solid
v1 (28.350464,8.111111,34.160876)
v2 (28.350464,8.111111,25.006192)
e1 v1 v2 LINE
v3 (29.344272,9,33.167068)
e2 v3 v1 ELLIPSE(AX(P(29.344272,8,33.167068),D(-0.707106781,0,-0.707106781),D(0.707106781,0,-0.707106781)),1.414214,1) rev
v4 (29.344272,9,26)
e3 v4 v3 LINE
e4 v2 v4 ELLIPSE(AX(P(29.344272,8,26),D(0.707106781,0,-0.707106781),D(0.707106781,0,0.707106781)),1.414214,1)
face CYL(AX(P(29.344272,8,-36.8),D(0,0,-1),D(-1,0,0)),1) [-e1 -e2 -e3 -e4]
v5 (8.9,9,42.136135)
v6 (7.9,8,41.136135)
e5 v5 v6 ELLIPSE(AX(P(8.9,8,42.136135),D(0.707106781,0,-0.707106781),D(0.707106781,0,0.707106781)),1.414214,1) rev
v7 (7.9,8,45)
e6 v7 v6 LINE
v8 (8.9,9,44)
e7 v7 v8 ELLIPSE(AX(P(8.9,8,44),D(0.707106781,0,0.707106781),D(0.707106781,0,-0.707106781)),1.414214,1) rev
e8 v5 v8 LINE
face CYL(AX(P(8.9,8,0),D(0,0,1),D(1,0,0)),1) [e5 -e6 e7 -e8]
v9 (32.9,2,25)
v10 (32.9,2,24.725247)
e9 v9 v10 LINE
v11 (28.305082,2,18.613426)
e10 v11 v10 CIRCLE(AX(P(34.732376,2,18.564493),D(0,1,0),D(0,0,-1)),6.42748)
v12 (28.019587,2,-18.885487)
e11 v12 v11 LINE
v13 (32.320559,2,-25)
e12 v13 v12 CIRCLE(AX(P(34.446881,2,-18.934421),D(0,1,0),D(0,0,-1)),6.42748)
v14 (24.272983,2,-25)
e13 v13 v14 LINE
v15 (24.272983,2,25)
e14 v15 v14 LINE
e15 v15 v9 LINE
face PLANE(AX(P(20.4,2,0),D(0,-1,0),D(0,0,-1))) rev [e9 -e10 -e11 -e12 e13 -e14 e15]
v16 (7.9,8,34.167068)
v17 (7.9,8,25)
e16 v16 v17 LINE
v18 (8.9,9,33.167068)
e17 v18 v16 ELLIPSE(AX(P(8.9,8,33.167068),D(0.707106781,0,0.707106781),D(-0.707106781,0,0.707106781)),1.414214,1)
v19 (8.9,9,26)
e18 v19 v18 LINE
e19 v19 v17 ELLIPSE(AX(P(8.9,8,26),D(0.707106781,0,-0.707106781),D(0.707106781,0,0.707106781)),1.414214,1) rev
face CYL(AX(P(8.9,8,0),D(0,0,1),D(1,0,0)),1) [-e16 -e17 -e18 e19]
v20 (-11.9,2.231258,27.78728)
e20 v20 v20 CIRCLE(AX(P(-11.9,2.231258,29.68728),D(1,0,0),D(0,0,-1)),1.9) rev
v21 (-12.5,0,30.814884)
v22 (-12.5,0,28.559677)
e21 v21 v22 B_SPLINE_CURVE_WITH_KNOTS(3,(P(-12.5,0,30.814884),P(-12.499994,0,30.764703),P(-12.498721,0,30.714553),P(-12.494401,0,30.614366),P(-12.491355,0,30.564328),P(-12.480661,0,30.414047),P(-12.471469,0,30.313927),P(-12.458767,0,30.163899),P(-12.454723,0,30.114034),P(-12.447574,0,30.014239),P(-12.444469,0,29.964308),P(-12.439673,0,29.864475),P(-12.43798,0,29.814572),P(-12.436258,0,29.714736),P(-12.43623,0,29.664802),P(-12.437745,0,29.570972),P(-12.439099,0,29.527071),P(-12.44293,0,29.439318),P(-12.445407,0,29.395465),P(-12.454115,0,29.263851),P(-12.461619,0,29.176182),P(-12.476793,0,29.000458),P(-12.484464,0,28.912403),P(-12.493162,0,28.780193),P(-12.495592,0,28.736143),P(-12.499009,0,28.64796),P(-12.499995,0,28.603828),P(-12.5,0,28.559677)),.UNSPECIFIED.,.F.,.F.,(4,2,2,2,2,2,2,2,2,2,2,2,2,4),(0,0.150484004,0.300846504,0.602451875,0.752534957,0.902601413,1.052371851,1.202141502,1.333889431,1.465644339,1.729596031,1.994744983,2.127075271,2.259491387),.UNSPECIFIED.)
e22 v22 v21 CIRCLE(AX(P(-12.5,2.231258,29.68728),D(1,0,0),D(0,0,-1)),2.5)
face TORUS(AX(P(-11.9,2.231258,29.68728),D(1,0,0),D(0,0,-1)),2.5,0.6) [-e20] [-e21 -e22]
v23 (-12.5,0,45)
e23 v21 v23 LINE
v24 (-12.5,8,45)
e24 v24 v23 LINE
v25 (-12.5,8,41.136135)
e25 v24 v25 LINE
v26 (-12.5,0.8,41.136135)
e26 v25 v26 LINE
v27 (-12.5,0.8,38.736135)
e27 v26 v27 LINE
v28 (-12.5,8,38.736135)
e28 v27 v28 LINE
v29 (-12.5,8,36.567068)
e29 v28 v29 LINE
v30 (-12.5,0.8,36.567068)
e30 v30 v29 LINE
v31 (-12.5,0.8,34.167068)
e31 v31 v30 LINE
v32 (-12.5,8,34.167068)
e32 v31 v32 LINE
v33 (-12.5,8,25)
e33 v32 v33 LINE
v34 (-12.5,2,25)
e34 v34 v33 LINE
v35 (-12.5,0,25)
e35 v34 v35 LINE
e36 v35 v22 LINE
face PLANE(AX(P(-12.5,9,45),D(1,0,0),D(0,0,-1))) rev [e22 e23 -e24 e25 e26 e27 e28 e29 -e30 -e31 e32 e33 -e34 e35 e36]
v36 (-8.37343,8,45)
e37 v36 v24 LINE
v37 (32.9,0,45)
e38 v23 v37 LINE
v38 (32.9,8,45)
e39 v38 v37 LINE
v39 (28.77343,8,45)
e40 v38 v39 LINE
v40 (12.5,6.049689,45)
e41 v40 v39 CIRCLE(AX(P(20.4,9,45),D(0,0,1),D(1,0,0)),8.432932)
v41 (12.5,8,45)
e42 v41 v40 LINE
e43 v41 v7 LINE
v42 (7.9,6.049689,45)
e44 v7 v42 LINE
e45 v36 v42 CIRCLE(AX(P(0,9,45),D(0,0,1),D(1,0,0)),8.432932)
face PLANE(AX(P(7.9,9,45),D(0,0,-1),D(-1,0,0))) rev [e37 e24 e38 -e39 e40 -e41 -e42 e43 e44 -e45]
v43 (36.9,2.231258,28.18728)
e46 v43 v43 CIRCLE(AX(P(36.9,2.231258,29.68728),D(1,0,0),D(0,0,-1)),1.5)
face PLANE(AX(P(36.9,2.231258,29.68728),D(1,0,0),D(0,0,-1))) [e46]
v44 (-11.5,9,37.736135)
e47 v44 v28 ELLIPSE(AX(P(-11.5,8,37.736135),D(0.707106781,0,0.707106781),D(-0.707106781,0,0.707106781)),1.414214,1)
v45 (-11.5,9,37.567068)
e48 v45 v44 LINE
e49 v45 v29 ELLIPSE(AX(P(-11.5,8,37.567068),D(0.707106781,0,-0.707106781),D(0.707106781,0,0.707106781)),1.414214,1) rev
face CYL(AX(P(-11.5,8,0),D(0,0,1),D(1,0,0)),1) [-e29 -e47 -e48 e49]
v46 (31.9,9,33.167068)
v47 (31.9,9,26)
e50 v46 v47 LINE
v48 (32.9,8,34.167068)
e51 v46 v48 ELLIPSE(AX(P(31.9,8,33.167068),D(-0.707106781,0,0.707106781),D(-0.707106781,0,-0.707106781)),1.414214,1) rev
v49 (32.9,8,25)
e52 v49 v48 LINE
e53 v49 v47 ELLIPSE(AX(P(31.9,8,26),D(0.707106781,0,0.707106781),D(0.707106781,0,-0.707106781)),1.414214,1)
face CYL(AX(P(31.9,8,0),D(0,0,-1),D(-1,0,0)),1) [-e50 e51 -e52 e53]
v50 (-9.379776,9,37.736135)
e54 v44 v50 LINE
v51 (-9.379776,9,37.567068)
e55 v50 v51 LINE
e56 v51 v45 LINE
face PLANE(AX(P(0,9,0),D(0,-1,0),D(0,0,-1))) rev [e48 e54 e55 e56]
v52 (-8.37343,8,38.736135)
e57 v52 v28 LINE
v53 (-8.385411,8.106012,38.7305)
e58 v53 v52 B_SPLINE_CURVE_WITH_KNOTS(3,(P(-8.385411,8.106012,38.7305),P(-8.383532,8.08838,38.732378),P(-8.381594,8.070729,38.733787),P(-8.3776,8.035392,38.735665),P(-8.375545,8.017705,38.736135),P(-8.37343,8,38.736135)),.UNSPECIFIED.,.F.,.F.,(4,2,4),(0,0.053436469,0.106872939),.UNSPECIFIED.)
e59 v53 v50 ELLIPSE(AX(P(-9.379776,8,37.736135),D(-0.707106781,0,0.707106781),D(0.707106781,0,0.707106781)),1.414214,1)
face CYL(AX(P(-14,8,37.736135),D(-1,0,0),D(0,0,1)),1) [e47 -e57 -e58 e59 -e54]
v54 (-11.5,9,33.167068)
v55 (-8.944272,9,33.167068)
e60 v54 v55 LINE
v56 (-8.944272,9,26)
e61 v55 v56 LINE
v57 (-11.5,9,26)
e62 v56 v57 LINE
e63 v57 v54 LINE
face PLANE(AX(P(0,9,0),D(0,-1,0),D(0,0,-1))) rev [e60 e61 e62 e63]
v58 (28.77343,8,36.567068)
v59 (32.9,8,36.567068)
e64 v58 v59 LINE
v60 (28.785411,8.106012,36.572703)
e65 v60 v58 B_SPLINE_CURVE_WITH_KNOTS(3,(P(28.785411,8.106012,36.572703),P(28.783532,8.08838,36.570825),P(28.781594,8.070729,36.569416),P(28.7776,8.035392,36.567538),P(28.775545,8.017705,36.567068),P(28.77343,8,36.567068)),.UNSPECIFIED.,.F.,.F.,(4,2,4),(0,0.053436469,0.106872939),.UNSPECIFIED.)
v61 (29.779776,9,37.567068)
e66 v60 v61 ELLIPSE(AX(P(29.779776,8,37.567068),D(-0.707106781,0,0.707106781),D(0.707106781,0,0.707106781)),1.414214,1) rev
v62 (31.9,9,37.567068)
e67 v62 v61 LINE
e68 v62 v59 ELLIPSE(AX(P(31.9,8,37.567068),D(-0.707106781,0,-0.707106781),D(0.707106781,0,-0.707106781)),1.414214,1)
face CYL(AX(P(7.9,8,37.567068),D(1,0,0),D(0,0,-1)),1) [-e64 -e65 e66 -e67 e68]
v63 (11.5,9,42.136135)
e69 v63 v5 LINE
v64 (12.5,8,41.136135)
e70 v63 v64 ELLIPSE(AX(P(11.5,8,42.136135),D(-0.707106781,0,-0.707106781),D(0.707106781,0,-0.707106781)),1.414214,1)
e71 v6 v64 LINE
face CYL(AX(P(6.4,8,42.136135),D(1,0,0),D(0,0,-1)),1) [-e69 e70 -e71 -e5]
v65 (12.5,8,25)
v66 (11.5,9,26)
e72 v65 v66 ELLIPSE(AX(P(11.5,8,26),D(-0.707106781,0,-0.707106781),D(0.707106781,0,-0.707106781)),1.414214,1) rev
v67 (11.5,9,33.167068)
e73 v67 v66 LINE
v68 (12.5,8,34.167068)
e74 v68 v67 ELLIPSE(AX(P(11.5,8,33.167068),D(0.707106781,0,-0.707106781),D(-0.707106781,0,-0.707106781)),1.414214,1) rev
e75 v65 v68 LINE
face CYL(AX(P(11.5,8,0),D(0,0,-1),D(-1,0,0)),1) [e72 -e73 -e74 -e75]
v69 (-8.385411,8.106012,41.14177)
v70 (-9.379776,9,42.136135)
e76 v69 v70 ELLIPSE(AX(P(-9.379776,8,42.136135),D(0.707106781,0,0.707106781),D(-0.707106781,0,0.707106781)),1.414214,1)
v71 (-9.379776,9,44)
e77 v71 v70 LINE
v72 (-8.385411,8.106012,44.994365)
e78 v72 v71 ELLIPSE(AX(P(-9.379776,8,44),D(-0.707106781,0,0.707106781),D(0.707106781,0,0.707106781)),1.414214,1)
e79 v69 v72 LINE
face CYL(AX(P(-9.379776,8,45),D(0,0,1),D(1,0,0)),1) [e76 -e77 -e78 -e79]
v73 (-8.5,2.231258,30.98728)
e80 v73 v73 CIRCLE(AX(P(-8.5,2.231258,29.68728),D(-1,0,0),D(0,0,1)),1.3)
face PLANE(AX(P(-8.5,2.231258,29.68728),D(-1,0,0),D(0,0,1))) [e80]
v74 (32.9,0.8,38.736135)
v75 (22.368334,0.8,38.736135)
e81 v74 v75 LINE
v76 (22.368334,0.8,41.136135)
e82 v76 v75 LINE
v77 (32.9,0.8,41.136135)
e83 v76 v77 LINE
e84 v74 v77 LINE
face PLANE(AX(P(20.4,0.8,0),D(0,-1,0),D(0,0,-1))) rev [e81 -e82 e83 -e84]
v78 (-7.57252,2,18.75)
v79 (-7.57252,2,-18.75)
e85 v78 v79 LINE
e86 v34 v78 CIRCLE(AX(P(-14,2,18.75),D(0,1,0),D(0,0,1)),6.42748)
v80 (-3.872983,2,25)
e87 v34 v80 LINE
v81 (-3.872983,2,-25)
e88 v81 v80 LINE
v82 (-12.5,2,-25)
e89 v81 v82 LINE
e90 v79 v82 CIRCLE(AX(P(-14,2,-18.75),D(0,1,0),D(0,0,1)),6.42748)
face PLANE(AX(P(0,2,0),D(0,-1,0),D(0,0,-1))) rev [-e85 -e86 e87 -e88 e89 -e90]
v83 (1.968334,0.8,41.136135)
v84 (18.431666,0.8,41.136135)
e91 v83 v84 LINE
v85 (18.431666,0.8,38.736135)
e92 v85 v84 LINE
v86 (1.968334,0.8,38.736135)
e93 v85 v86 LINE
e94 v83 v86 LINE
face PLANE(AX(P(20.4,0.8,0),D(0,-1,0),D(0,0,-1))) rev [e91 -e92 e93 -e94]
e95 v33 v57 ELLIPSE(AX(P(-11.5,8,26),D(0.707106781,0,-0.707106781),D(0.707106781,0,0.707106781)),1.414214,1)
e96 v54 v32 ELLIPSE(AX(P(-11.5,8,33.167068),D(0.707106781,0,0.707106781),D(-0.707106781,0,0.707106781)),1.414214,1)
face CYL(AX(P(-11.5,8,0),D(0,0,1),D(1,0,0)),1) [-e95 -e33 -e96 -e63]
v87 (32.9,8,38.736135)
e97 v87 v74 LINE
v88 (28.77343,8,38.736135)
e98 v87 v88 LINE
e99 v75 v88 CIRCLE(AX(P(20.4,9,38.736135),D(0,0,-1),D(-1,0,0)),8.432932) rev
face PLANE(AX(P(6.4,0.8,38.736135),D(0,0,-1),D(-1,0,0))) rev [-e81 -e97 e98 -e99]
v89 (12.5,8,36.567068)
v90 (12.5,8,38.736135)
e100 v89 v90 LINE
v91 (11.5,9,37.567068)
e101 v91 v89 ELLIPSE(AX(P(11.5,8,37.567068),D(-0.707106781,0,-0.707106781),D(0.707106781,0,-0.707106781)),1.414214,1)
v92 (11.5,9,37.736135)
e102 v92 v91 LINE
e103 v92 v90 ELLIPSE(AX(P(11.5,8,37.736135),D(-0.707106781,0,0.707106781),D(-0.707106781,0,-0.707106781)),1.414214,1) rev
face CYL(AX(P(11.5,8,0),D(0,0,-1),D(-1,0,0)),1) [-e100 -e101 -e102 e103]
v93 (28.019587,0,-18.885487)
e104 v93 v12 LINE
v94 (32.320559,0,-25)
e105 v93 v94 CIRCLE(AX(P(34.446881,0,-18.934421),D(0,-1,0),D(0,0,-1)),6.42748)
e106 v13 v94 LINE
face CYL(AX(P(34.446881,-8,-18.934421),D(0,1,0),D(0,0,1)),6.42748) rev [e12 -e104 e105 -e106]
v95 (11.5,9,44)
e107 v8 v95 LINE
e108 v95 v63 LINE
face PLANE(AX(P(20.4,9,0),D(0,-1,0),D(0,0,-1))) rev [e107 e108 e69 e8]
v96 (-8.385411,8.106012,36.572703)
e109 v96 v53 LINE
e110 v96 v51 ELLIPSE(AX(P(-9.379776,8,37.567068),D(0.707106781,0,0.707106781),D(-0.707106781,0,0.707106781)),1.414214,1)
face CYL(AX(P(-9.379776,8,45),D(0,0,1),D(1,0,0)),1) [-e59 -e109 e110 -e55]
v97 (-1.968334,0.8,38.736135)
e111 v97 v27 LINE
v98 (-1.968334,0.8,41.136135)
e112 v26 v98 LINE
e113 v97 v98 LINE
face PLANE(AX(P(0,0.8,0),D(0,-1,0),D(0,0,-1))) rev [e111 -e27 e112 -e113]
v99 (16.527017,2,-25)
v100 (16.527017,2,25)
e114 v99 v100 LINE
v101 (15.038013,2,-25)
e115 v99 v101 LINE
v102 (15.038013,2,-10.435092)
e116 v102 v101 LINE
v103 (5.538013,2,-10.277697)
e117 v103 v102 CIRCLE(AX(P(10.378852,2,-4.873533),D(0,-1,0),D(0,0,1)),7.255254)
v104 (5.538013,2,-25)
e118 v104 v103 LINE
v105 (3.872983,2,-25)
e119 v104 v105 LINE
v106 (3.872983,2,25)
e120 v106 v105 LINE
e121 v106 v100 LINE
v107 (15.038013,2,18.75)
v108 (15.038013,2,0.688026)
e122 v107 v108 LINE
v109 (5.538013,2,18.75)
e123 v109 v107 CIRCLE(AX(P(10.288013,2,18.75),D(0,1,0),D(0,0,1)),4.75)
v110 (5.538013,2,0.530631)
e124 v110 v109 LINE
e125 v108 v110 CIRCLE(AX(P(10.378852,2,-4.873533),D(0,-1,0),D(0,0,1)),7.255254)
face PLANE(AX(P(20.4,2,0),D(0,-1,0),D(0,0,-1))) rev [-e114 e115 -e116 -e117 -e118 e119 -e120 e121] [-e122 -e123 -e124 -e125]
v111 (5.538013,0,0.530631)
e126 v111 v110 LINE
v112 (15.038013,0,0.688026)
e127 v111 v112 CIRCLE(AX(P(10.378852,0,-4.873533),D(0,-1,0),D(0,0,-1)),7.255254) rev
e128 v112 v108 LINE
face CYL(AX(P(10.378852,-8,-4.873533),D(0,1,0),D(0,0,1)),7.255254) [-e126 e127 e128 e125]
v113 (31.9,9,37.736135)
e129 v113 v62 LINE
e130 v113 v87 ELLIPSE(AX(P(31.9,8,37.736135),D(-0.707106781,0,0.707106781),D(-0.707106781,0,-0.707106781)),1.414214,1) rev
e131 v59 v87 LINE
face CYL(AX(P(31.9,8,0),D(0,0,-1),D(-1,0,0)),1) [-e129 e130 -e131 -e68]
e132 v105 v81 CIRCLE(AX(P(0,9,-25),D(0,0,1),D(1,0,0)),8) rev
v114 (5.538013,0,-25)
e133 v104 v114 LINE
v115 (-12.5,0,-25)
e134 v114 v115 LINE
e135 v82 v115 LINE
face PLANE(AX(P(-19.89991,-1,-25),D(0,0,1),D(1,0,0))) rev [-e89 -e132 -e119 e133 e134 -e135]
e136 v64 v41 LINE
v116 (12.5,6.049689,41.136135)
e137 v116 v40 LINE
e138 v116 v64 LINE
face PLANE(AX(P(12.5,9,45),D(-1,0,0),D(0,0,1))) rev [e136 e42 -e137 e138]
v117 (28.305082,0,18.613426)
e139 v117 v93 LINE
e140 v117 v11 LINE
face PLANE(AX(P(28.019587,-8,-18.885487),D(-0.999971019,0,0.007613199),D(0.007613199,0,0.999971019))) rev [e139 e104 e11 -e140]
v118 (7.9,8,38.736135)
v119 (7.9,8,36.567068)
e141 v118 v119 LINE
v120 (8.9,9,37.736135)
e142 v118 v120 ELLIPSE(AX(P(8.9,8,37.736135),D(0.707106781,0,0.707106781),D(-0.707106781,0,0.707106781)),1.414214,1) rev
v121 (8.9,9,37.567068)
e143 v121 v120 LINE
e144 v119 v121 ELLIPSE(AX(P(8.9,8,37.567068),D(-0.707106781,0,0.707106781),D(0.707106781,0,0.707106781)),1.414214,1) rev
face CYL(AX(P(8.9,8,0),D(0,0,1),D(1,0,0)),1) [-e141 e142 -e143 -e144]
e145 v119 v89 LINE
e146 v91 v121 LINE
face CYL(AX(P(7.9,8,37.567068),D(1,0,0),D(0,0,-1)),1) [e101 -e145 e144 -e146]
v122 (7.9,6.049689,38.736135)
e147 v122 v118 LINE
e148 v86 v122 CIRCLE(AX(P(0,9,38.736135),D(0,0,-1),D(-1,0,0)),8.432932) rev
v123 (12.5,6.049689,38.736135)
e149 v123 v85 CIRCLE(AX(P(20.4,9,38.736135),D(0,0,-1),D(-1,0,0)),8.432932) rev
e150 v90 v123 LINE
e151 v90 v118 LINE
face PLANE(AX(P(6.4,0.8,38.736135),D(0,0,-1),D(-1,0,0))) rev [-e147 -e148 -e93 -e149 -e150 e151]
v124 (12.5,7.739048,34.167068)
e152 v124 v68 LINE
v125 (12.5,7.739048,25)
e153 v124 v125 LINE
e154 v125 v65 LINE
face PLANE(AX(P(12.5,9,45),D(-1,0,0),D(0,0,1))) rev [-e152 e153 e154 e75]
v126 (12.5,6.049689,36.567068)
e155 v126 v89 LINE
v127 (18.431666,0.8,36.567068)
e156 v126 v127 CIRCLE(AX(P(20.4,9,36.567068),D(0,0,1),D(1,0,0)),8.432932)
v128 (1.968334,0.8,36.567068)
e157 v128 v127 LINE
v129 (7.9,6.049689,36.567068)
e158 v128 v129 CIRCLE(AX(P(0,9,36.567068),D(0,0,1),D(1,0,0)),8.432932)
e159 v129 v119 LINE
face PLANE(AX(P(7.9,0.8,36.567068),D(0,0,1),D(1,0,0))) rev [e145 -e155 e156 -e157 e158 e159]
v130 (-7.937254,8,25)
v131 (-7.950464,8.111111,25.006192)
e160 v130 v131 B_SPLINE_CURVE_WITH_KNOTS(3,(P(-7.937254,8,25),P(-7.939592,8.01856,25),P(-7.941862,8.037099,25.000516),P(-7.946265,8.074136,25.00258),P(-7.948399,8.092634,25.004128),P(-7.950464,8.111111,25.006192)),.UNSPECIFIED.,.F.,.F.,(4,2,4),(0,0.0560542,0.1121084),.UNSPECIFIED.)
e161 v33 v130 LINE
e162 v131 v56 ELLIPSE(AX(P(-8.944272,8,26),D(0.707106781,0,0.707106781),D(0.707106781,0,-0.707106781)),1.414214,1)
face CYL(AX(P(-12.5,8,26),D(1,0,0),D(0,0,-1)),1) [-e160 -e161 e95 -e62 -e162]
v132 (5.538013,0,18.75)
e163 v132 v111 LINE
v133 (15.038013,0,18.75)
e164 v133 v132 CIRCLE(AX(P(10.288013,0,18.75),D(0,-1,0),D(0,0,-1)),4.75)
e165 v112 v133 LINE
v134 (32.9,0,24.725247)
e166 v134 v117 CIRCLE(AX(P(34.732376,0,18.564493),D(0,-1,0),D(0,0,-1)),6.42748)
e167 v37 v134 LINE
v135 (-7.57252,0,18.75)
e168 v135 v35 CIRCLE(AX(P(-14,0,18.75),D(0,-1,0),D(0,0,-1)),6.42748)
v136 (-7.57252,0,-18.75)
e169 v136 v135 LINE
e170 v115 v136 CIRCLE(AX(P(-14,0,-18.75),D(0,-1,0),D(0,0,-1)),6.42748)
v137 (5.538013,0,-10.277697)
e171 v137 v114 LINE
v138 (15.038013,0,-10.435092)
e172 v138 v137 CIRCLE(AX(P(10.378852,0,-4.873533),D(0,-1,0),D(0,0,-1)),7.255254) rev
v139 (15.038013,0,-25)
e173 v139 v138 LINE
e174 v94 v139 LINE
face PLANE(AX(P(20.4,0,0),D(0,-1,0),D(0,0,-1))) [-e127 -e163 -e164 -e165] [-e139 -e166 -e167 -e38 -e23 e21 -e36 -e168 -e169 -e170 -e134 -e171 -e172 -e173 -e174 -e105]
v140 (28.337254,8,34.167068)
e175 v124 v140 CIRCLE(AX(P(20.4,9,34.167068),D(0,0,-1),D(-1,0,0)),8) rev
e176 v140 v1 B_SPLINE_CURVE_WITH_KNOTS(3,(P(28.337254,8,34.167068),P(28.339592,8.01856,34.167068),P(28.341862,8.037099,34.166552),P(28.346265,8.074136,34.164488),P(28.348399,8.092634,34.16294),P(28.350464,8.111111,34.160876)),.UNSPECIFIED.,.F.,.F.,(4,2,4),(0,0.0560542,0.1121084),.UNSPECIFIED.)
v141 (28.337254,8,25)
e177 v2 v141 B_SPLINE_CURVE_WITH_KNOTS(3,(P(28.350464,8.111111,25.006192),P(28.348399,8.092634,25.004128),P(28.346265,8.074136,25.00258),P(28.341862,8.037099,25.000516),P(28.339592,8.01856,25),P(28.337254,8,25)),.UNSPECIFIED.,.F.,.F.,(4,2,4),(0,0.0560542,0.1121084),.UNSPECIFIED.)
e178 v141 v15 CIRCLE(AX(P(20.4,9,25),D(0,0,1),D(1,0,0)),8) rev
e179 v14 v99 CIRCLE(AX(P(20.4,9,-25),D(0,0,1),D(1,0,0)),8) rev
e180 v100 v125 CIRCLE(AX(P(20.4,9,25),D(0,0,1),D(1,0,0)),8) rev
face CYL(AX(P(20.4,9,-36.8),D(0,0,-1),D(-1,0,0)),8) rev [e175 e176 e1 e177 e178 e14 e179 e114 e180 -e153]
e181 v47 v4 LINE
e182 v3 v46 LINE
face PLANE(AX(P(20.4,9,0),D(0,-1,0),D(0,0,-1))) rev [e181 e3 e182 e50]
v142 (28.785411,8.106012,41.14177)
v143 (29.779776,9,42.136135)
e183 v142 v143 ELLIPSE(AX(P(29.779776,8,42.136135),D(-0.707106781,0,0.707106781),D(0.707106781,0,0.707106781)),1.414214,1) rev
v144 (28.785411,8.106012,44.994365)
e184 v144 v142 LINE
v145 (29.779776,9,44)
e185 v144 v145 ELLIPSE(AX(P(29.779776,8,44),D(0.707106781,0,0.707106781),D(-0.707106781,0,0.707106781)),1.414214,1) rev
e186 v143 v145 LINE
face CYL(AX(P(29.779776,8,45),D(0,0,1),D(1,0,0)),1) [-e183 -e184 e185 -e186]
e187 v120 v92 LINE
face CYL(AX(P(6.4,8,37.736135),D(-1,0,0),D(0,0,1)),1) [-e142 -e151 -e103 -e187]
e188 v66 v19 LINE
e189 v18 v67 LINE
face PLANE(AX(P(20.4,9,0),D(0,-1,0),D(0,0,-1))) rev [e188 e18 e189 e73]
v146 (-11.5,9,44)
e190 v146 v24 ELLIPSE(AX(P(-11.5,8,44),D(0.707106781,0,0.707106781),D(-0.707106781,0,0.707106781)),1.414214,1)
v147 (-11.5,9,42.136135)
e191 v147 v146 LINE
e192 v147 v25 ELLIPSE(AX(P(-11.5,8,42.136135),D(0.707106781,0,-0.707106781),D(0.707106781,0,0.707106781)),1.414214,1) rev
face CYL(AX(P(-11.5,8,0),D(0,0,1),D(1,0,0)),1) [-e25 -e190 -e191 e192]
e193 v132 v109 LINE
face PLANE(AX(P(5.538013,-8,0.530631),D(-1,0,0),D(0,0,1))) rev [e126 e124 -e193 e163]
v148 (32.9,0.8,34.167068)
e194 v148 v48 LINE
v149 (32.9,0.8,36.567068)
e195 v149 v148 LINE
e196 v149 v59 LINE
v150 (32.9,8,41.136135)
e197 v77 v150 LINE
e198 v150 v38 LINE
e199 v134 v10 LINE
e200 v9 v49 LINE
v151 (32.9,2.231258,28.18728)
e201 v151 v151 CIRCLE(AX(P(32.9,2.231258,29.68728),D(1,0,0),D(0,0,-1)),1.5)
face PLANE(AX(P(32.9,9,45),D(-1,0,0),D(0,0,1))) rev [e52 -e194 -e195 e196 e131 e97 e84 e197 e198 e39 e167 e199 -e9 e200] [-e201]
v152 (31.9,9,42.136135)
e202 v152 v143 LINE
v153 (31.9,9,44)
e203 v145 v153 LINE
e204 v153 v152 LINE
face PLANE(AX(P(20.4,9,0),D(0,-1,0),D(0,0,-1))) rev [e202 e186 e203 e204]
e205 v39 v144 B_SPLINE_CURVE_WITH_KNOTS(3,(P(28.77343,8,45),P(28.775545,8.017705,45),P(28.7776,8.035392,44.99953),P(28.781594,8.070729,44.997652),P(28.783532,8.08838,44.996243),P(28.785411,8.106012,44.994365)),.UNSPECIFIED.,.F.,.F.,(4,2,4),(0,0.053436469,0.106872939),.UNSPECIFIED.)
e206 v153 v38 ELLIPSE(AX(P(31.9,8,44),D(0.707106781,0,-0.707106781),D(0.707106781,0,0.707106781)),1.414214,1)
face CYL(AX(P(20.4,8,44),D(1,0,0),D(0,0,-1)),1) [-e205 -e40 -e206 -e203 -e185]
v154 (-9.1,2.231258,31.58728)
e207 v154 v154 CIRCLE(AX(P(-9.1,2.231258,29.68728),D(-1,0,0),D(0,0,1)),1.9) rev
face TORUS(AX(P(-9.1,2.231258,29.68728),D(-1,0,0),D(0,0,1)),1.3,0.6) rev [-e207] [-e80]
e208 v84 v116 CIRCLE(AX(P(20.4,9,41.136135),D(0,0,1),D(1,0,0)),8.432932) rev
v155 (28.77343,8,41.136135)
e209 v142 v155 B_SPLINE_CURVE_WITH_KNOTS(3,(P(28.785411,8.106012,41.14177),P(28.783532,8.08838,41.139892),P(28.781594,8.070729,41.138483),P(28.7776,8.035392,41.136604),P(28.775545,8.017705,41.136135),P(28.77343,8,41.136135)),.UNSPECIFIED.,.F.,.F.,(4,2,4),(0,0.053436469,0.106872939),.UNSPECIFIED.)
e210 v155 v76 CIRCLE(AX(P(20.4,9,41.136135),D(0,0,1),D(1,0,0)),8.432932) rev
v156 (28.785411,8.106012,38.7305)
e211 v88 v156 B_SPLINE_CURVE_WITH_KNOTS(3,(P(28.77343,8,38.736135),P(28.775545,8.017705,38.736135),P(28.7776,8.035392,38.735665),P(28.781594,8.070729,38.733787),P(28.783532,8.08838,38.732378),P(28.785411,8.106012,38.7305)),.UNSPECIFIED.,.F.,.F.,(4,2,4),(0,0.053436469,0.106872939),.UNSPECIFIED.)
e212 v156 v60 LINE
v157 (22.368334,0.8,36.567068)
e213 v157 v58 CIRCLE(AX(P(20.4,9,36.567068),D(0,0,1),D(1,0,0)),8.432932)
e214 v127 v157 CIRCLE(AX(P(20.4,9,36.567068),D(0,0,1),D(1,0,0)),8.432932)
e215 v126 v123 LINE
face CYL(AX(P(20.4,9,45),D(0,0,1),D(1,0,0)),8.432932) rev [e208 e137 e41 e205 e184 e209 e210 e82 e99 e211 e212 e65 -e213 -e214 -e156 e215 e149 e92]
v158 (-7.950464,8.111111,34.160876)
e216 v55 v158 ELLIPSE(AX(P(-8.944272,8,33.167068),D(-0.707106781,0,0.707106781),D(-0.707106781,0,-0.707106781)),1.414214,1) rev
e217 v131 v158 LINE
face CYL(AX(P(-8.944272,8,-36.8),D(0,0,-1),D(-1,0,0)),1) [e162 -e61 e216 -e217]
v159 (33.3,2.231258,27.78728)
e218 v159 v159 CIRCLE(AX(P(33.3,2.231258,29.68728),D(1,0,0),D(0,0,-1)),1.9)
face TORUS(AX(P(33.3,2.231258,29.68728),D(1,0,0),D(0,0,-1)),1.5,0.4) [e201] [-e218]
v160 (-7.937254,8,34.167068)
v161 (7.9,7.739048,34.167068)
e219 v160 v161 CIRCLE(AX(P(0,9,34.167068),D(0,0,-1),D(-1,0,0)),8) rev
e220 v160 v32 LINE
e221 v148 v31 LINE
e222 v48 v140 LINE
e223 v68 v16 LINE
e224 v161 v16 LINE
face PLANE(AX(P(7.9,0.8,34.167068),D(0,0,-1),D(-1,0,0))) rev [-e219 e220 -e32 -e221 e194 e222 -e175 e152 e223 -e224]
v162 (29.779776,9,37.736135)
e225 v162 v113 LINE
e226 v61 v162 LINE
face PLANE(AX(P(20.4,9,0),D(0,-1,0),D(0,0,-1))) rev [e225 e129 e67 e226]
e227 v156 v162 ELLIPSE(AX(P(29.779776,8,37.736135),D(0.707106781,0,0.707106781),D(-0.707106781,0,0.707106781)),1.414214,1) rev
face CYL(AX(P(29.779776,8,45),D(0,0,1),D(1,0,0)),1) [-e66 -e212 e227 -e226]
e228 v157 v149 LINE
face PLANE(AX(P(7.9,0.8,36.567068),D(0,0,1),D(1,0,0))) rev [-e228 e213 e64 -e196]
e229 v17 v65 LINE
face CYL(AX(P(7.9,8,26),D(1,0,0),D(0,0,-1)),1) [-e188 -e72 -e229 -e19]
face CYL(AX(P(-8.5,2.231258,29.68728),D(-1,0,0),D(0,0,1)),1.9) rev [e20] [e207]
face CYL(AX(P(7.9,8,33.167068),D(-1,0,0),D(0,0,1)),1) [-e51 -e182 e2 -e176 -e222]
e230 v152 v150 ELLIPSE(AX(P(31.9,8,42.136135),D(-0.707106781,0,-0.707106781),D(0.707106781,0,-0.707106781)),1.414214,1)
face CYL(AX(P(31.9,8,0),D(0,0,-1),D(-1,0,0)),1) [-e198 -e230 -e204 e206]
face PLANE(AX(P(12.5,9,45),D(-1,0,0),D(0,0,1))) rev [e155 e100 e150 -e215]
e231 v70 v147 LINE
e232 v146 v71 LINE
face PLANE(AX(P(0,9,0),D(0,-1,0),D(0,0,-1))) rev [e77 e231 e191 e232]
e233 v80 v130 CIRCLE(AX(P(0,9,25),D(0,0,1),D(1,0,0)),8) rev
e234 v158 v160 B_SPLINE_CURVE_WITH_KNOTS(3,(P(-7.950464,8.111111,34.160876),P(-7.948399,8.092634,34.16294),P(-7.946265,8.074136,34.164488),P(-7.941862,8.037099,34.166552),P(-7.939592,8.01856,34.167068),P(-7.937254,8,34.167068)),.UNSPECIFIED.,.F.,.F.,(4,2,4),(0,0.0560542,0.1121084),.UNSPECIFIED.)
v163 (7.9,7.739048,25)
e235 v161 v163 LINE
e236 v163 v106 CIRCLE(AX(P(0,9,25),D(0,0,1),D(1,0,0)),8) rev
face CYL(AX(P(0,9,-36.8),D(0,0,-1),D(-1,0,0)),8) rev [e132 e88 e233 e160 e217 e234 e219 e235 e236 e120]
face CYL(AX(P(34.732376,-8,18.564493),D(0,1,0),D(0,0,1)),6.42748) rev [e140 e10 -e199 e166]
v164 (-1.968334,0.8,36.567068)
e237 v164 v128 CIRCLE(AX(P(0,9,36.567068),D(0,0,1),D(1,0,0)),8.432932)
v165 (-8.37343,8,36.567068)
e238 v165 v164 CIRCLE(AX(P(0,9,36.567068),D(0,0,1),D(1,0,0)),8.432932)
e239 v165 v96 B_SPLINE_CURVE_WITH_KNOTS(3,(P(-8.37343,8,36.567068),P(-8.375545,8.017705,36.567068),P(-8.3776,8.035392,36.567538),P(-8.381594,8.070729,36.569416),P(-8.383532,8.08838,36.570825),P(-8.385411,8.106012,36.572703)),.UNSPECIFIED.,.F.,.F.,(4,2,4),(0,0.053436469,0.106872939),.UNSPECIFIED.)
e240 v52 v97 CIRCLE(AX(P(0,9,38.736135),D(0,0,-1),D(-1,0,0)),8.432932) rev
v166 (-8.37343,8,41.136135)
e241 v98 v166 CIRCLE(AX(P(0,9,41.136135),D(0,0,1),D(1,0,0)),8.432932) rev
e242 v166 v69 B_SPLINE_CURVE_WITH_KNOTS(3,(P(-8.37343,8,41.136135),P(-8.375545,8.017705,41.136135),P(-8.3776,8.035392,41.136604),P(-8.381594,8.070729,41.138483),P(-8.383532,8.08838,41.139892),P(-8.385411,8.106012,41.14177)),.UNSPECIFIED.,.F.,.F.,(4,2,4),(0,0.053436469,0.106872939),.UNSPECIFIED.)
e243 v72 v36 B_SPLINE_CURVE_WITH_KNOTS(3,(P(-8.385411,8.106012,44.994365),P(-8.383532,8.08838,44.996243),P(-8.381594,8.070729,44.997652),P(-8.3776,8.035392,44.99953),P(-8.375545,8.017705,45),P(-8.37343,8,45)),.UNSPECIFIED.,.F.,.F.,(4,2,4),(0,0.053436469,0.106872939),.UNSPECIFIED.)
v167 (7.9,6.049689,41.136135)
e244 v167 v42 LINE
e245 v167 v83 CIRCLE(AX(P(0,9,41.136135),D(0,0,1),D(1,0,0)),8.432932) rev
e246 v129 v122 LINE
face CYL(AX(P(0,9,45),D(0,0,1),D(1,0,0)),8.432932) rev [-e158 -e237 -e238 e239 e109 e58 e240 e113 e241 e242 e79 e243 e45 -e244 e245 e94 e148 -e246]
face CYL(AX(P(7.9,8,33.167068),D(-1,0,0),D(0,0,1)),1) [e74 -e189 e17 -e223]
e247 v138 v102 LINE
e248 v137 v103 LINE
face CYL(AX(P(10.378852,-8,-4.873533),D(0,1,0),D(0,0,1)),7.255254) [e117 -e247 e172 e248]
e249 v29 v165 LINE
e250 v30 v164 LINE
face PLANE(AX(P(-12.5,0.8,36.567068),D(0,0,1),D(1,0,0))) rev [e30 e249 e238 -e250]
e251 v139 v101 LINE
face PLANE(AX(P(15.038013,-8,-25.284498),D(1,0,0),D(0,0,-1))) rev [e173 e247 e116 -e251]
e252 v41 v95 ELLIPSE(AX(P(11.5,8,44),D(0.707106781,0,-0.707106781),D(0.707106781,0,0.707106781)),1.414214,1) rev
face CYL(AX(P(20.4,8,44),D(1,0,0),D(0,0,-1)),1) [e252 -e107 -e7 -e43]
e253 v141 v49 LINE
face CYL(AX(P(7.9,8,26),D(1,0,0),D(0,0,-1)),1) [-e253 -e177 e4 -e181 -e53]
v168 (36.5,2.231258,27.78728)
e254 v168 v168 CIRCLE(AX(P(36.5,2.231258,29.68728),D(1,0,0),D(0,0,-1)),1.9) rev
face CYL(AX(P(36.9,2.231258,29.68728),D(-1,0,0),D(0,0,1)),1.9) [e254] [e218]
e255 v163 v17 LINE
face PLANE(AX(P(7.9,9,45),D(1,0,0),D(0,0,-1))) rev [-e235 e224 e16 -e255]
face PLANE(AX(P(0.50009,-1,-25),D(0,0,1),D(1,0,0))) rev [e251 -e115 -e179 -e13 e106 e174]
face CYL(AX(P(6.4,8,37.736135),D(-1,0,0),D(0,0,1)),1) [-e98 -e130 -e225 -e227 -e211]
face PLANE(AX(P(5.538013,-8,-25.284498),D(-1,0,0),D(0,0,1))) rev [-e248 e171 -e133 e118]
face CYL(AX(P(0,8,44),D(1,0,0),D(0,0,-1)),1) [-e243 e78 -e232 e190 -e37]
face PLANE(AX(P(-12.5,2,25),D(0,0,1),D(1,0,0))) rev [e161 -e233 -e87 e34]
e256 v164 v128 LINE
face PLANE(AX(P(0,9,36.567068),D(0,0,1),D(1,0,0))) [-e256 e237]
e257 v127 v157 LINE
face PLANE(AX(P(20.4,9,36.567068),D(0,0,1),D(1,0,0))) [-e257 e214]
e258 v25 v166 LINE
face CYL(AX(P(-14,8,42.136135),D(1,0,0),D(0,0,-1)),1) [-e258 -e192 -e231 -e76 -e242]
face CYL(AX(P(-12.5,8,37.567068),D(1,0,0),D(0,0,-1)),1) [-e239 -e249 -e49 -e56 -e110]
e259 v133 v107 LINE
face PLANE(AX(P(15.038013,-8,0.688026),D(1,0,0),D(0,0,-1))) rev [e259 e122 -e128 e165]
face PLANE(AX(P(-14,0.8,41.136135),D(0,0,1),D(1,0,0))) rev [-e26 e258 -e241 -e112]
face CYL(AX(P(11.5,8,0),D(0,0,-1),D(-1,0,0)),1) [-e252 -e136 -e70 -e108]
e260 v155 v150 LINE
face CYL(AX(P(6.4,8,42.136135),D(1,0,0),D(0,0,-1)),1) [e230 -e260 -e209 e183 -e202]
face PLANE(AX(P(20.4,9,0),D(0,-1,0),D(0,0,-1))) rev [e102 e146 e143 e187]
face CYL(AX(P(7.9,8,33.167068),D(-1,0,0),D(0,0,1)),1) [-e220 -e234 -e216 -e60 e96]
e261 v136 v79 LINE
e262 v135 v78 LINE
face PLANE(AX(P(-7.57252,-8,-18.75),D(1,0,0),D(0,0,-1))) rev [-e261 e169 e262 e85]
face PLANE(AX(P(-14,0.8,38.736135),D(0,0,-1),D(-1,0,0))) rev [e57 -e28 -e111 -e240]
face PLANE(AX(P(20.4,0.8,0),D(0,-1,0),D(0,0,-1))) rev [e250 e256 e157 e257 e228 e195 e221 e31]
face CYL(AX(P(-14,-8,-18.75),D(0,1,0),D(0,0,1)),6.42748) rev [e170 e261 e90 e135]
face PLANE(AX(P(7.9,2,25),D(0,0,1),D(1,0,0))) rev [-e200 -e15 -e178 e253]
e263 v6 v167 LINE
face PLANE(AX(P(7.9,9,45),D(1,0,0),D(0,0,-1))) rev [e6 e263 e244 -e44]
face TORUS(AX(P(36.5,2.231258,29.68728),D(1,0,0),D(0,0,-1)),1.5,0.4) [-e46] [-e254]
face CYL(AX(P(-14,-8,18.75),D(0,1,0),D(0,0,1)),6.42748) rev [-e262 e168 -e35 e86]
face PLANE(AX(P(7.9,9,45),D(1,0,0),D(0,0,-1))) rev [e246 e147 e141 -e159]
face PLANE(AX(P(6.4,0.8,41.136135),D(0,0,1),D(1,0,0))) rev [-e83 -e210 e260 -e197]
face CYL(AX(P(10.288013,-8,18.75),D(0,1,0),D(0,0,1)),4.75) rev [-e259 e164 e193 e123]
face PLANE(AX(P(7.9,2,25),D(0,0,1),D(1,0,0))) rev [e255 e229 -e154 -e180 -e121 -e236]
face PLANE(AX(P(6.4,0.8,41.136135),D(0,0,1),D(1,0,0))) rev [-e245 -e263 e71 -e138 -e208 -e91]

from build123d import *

# Parameters (mm, degrees)
SKETCH1_W           = 25
SKETCH1_H           = 90
BOSS_EXTRUDE1_DEPTH = 9
SKETCH4_W           = 8
SKETCH4_H           = 71
SKETCH5_W           = 25
SKETCH5_H           = 2.4
SKETCH5_W_2         = 28
FLANGE_SLOT_DEPTH   = 8.2
SKETCH6_W           = 8.432931683
SKETCH6_H           = 8.432931683
SKETCH18_W          = 25
SKETCH18_H          = 50
SYRINGE_BAY_DEPTH   = 7
SKETCH26_W          = 38.352553791
SKETCH26_H          = 20.215566654
CUT_EXTRUDE14_DEPTH = 10
LPATTERN3_COUNT     = 2
LPATTERN3_PITCH     = 20.4
SKETCH31_R          = 1.9
CUT_EXTRUDE16_DEPTH = 4
SKETCH33_R          = 1.9
BOSS_EXTRUDE2_DEPTH = 4
FILLET1_R           = 0.4
FILLET2_R           = 0.6
CUT_EXTRUDE17_DEPTH = 10
FILLET7_R           = 1


with BuildPart() as part:
    # Sketch1 → Boss-Extrude1 (new body)
    with BuildSketch(Plane(origin=(0, 0, 0), x_dir=(1, 0, 0), z_dir=(0, 1, 0))):
        Rectangle(SKETCH1_W, SKETCH1_H)
    extrude(amount=BOSS_EXTRUDE1_DEPTH)

    # Sketch4 → Syringe Body slot (revolve, cut)
    with BuildSketch(Plane(origin=(0, 9, 0), x_dir=(1, 0, 0), z_dir=(0, 1, 0))):
        with Locations((-4, 1.3)):
            Rectangle(SKETCH4_W, SKETCH4_H)
    revolve(axis=Axis((0, 9, -36.8), (0, 0, 1)), mode=Mode.SUBTRACT)

    # Sketch5 → Flange Slot (cut)
    with BuildSketch(Plane(origin=(0, 9, 0), x_dir=(1, 0, 0), z_dir=(0, 1, 0))):
        with Locations((0, -35.367068317)):
            Rectangle(SKETCH5_W, SKETCH5_H)
        with Locations((0, -39.936134865)):
            Rectangle(SKETCH5_W_2, SKETCH5_H)
    extrude(amount=-FLANGE_SLOT_DEPTH, mode=Mode.SUBTRACT)

    # Sketch6 → Plunger Slot (revolve, cut)
    with BuildSketch(Plane(origin=(0, 9, 0), x_dir=(1, 0, 0), z_dir=(0, 1, 0))):
        with Locations((-4.216465842, -40.783534159)):
            Rectangle(SKETCH6_W, SKETCH6_H)
    revolve(axis=Axis((0, 9, 45), (0, 0, -1)), mode=Mode.SUBTRACT)

    # Sketch18 → Syringe Bay (cut)
    with BuildSketch(Plane(origin=(0, 9, 0), x_dir=(1, 0, 0), z_dir=(0, 1, 0))):
        Rectangle(SKETCH18_W, SKETCH18_H)
    extrude(amount=-SYRINGE_BAY_DEPTH, mode=Mode.SUBTRACT)

    # Sketch26 → Cut-Extrude14 (cut)
    with BuildSketch(Plane(origin=(0, 9, 0), x_dir=(1, 0, 0), z_dir=(0, 1, 0))):
        with Locations((-0.72363309, 35.107783327)):
            Rectangle(SKETCH26_W, SKETCH26_H)
    extrude(amount=-CUT_EXTRUDE14_DEPTH, mode=Mode.SUBTRACT)


with BuildPart() as lpattern3_1:
    # LPattern3: pattern copy
    add(part.part.moved(Location(Vector(1, 0, 0) * (1 * LPATTERN3_PITCH))))


with BuildPart() as part_1:
    add(part.part)

    # Sketch31 → Cut-Extrude16 (cut)
    with BuildSketch(Plane.ZY.offset(12.5)):
        with Locations((29.687280392, 2.231257616)):
            Circle(SKETCH31_R)
    extrude(amount=-CUT_EXTRUDE16_DEPTH, mode=Mode.SUBTRACT)

    # Fillet2
    # the kernel refuses this fillet: 0.6 mm, written as the material it adds along each edge
    with BuildSketch(Plane(origin=(-8.5, 2.231257616, 29.687280392), x_dir=(0, 0, 1), z_dir=(0, -1, 0))) as fillet2_piece_1:
        with BuildLine():
            CenterArc((1.9 - FILLET2_R, FILLET2_R), FILLET2_R, 270, 90)
            Line((1.9 - FILLET2_R, 0), (1.9, 0))
            Line((1.9, 0), (1.9, FILLET2_R))
        make_face()
    revolve(axis=Axis((-8.5, 2.231257616, 29.687280392), (-1, 0, 0)))
    # the kernel refuses this fillet: 0.6 mm, written as the material it takes off along each edge
    with BuildSketch(Plane(origin=(-12.5, 2.231257616, 29.687280392), x_dir=(0, 0, 1), z_dir=(0, -1, 0))) as fillet2_2_piece_1:
        with BuildLine():
            CenterArc((1.9 + FILLET2_R, -FILLET2_R), FILLET2_R, 90, 90)
            Line((1.9, -FILLET2_R), (1.9, 0))
            Line((1.9, 0), (1.9 + FILLET2_R, 0))
        make_face()
    revolve(axis=Axis((-12.5, 2.231257616, 29.687280392), (-1, 0, 0)), mode=Mode.SUBTRACT)


with BuildPart() as body_3:
    # Sketch33 → Boss-Extrude2 (new body)
    with BuildSketch(Plane(origin=(32.9, 0, 0), x_dir=(0, 0, -1), z_dir=(1, 0, 0))):
        with Locations((-29.687280392, 2.231257616)):
            Circle(SKETCH33_R)
    extrude(amount=BOSS_EXTRUDE2_DEPTH)

    # Fillet1
    fillet1_edges = [body_3.edges().sort_by_distance(p)[0] for p in [
        (32.9, 2.231257616, 31.587280392),
        (36.9, 2.231257616, 31.587280392),
    ]]
    fillet(fillet1_edges, radius=FILLET1_R)


with BuildPart() as cut_extrude17_tool:
    # Sketch35 → Cut-Extrude17 (new body)
    with BuildSketch(Plane(origin=(0, 2, 0), x_dir=(1, 0, 0), z_dir=(0, 1, 0))):
        with BuildLine():
            Line((-7.572519934, 18.75), (-7.572519934, -18.75))
            ThreePointArc((-7.572519934, -18.75), (-14, -25.177480066), (-20.427480066, -18.75))
            Line((-20.427480066, -18.75), (-20.427480066, 18.75))
            ThreePointArc((-20.427480066, 18.75), (-14, 25.177480066), (-7.572519934, 18.75))
        make_face()
        with BuildLine():
            Line((15.038012539, 25.284497927), (15.038012539, 10.435091669))
            ThreePointArc((15.038012539, 10.435091669), (10.258664257, 12.127791533), (5.538012539, 10.277696889))
            Line((5.538012539, 10.277696889), (5.538012539, 25.284497927))
            ThreePointArc((5.538012539, 25.284497927), (10.288012539, 30.034497927), (15.038012539, 25.284497927))
        make_face()
        with BuildLine():
            Line((28.019587368, 18.885486869), (28.305082347, -18.61342635))
            ThreePointArc((28.305082347, -18.61342635), (34.781309827, -24.991786455), (41.159669932, -18.515558975))
            Line((41.159669932, -18.515558975), (40.874174953, 18.983354244))
            ThreePointArc((40.874174953, 18.983354244), (34.397947473, 25.361714349), (28.019587368, 18.885486869))
        make_face()
        with BuildLine():
            Line((15.038012539, -0.688026199), (15.038012539, -18.75))
            ThreePointArc((15.038012539, -18.75), (10.288012539, -23.5), (5.538012539, -18.75))
            Line((5.538012539, -18.75), (5.538012539, -0.530631419))
            ThreePointArc((5.538012539, -0.530631419), (10.258664257, -2.380726063), (15.038012539, -0.688026199))
        make_face()
    extrude(amount=-CUT_EXTRUDE17_DEPTH)


with BuildPart() as part_2:
    add(part_1.part)

    # Cut-Extrude17: cut by cut_extrude17_tool
    add(cut_extrude17_tool.part, mode=Mode.SUBTRACT)


with BuildPart() as lpattern3_1_1:
    add(lpattern3_1.part)

    # Cut-Extrude17: cut by cut_extrude17_tool
    add(cut_extrude17_tool.part, mode=Mode.SUBTRACT)

    # Combine2: union part, body 3
    add(part_2.part)
    add(body_3.part)

    # Fillet7
    fillet7_edges = [lpattern3_1_1.edges().sort_by_distance(p)[0] for p in [
        (7.9, 9, 29.583534158),
        (10.2, 9, 25),
        (30.65, 9, 25),
        (10.2, 9, 45),
        (32.9, 9, 37.651601591),
        (32.9, 9, 29.583534158),
        (7.9, 9, 37.651601591),
        (7.9, 9, 43.068067433),
        (10.2, 9, 41.136134865),
        (30.866465842, 9, 38.736134865),
        (-10.25, 9, 34.167068317),
        (12.5, 9, 37.651601591),
        (12.5, 9, 43.068067433),
        (-8.432931683, 9, 37.651601591),
        (-8.432931683, 9, 43.068067433),
        (-12.5, 9, 29.583534158),
        (-8, 9, 29.583534158),
        (12.5, 9, 29.583534158),
        (-12.5, 9, 37.651601591),
        (-12.5, 9, 43.068067433),
        (-10.466465842, 9, 45),
        (-10.466465842, 9, 38.736134865),
        (-10.466465842, 9, 36.567068317),
        (-10.466465842, 9, 41.136134865),
        (-10.25, 9, 25),
        (10.2, 9, 34.167068317),
        (10.2, 9, 36.567068317),
        (30.65, 9, 34.167068317),
        (32.9, 9, 43.068067433),
        (10.2, 9, 38.736134865),
        (30.866465842, 9, 41.136134865),
        (30.866465842, 9, 36.567068317),
        (30.866465842, 9, 45),
        (28.832931683, 9, 37.651601591),
        (28.832931683, 9, 43.068067433),
        (28.4, 9, 29.583534158),
    ]]
    fillet(fillet7_edges, radius=FILLET7_R)


solid = lpattern3_1_1.part
